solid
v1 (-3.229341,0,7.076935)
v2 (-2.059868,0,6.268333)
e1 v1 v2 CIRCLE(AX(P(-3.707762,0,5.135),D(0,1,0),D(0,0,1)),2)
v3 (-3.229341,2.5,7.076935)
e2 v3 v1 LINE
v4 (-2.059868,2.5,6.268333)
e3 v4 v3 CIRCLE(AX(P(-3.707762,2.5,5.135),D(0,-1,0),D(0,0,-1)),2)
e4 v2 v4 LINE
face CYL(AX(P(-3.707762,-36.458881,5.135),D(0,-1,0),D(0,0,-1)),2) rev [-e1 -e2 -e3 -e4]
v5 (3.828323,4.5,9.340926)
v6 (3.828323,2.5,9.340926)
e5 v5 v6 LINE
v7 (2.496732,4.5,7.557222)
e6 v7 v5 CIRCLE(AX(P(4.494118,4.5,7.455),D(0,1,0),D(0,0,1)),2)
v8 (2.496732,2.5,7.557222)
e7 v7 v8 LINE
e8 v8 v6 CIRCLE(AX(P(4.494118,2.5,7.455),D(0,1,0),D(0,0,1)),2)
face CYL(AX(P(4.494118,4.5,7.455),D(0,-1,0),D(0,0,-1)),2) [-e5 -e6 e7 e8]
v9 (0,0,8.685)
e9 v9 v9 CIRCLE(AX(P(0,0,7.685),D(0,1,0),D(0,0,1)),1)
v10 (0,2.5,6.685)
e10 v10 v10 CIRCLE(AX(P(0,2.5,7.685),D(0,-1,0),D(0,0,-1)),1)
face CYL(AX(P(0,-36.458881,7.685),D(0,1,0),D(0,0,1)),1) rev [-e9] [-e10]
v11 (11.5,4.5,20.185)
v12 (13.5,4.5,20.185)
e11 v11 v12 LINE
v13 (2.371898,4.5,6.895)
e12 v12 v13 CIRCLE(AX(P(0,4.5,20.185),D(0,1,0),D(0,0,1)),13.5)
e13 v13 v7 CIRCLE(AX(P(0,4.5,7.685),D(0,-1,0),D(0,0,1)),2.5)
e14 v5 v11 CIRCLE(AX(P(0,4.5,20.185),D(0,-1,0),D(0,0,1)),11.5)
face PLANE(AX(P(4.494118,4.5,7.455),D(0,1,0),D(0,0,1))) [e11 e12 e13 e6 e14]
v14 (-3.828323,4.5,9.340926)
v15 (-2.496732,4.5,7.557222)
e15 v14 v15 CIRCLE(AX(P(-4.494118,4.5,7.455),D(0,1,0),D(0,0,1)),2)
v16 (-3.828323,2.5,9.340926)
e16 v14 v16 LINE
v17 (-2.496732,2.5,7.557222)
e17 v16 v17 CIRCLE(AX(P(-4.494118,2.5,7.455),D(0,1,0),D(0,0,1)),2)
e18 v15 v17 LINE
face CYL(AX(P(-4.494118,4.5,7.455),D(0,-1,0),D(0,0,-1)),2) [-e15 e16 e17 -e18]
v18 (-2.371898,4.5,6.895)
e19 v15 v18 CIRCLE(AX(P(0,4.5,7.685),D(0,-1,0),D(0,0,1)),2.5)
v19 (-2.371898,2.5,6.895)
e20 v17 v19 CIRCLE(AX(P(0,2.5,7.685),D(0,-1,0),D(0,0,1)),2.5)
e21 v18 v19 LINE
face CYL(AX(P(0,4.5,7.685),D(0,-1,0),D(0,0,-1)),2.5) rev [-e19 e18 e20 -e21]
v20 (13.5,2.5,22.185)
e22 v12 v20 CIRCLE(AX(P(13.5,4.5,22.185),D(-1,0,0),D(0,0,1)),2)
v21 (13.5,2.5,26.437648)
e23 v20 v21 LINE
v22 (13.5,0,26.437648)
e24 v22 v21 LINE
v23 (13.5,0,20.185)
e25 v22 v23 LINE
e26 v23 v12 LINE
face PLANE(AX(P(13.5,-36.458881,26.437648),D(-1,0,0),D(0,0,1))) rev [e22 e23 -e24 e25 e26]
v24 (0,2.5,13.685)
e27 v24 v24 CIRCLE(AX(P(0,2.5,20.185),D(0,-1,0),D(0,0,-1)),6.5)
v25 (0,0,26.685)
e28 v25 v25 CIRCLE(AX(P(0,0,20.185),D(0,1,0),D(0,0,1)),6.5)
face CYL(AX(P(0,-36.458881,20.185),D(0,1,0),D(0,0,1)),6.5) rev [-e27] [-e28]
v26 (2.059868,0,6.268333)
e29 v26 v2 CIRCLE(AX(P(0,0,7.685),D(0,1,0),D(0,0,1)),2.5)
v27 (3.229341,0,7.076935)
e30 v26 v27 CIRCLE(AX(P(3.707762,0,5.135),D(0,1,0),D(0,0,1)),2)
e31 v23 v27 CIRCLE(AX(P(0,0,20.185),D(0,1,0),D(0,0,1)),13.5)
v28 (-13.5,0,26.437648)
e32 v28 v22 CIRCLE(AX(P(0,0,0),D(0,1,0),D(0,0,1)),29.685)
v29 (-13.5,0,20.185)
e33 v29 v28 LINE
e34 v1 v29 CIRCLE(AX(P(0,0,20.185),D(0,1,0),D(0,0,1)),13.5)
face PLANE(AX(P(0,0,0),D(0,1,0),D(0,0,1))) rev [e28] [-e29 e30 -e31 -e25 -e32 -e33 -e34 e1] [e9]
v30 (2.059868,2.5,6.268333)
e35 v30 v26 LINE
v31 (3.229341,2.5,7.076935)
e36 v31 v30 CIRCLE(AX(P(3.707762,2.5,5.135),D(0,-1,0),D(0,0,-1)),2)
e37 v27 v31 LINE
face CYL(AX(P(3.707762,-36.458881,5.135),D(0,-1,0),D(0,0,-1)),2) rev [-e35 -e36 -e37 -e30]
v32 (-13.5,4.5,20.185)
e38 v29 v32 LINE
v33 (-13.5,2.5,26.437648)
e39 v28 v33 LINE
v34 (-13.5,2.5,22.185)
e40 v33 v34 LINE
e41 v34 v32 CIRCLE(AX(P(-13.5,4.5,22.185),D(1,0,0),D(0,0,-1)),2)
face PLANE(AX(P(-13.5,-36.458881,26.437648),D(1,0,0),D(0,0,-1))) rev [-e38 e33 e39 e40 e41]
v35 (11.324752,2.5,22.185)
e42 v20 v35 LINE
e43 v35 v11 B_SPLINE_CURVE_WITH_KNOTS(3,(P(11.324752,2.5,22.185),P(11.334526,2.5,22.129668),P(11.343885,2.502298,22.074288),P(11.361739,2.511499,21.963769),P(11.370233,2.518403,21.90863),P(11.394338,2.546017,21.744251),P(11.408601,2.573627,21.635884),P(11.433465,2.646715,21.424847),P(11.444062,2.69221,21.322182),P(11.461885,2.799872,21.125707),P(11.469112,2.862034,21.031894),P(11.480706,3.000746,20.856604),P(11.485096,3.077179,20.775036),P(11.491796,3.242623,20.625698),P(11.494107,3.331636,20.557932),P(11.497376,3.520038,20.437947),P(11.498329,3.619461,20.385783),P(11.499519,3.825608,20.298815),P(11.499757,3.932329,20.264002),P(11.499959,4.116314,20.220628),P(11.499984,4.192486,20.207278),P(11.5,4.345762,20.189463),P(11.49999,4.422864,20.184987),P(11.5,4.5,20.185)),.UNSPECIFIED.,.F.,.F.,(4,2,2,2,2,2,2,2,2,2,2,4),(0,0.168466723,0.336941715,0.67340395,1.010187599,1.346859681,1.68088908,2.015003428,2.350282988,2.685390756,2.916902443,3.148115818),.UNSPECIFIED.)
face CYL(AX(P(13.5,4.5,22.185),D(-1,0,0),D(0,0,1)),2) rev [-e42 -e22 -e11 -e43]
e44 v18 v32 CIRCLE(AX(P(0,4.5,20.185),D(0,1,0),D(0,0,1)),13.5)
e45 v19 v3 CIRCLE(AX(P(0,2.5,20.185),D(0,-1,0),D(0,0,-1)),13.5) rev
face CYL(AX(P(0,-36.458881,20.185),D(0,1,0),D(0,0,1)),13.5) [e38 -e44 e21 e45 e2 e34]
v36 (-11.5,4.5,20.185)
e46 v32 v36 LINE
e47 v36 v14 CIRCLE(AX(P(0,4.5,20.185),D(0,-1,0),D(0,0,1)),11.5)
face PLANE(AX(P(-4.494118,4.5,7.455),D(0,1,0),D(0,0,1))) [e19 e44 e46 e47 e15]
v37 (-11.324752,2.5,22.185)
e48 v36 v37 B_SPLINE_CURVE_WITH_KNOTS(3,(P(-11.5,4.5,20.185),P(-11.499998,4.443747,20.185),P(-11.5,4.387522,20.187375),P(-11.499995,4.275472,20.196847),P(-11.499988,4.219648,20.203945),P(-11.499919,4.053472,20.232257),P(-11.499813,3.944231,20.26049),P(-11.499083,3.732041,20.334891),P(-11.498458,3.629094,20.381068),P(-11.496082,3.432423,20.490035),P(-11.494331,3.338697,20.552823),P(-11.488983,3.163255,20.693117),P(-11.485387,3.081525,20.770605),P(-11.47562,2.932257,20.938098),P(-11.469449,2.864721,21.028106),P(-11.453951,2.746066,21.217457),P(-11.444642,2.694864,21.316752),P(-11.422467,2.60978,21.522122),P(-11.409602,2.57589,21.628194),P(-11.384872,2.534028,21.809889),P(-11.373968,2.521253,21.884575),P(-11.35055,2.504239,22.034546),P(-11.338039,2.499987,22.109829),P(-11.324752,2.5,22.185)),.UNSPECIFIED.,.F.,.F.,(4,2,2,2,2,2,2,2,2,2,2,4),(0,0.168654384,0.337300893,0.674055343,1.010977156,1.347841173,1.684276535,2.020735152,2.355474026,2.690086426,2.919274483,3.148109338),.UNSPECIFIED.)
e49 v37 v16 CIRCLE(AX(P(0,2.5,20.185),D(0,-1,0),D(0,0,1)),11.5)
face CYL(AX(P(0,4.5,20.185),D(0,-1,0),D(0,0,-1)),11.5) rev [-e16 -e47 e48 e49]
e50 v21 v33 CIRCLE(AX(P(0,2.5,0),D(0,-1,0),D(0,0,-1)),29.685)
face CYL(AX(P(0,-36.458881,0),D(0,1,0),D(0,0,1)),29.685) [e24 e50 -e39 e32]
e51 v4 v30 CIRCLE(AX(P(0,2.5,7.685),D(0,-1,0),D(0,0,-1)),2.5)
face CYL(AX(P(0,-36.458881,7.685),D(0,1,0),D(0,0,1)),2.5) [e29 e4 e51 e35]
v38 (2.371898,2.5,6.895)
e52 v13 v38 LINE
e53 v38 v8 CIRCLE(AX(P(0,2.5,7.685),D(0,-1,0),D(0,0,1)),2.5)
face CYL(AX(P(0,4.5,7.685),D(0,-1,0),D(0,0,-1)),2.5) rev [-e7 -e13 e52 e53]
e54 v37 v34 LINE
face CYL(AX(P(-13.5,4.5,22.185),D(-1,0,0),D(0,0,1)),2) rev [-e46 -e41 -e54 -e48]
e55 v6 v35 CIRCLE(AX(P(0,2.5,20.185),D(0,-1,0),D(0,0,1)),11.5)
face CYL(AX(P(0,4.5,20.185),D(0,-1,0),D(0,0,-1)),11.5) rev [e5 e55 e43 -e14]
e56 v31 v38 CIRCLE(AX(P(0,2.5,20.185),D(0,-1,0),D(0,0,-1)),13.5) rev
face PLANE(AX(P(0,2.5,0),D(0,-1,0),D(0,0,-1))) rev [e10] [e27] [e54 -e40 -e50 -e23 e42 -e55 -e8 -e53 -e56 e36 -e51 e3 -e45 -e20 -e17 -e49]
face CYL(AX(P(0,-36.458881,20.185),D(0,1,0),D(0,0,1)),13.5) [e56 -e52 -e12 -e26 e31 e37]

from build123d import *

# Parameters (mm, degrees)
SKETCH1_R                  = 6.5
SKETCH1_R_2                = 1
MAIN_EXTRUDE_DEPTH         = 2.5
BATTERY_START              = 2
BATTERY_RING_CRADDLE_DEPTH = 2
FILLETS_R                  = 2


with BuildPart() as part:
    # Sketch1 → Main extrude (new body)
    with BuildSketch(Plane.XZ.offset(-2.5)):
        with BuildLine():
            Line((-13.5, 26.437647872), (-13.5, 20.185))
            ThreePointArc((-13.5, 20.185), (-10.350618886, 11.518126938), (-2.371897974, 6.895))
            ThreePointArc((-2.371897974, 6.895), (0, 5.185), (2.371897974, 6.895))
            ThreePointArc((2.371897974, 6.895), (10.350618886, 11.518126938), (13.5, 20.185))
            Line((13.5, 20.185), (13.5, 26.437647872))
            ThreePointArc((13.5, 26.437647872), (0, 29.685), (-13.5, 26.437647872))
        make_face()
        with Locations(Location((0, 20.185, 0), (0, 0, 90))):
            Circle(SKETCH1_R, mode=Mode.SUBTRACT)
        with Locations(Location((0, 7.685, 0), (0, 0, 90))):
            Circle(SKETCH1_R_2, mode=Mode.SUBTRACT)
    extrude(amount=MAIN_EXTRUDE_DEPTH)

    # Sketch2 → Battery ring craddle (add)
    with BuildSketch(Plane(origin=(0, 2.5, 0), x_dir=(1, 0, 0), z_dir=(0, 1, 0)).offset(BATTERY_START)):
        with BuildLine():
            Line((-13.5, -20.185), (-11.5, -20.185))
            ThreePointArc((-11.5, -20.185), (-9.38817648, -13.543302748), (-3.828323063, -9.340925926))
            ThreePointArc((-3.828323063, -9.340925926), (-2.89145393, -8.651439161), (-2.496732433, -7.557222222))
            ThreePointArc((-2.496732433, -7.557222222), (-2.456730567, -7.221885627), (-2.371897974, -6.895))
            ThreePointArc((-2.371897974, -6.895), (-10.350618886, -11.518126938), (-13.5, -20.185))
        make_face()
        with BuildLine():
            Line((13.5, -20.185), (11.5, -20.185))
            ThreePointArc((11.5, -20.185), (9.38817648, -13.543302748), (3.828323063, -9.340925926))
            ThreePointArc((3.828323063, -9.340925926), (2.89145393, -8.651439161), (2.496732433, -7.557222222))
            ThreePointArc((2.496732433, -7.557222222), (2.456730567, -7.221885627), (2.371897974, -6.895))
            ThreePointArc((2.371897974, -6.895), (10.350618886, -11.518126938), (13.5, -20.185))
        make_face()
    extrude(amount=-BATTERY_RING_CRADDLE_DEPTH)

    # Fillets
    # the kernel refuses this fillet: 2 mm, written as the material it adds along each edge
    with BuildSketch(Plane(origin=(2.371897974, 2.5, 6.895), x_dir=(-0.4457237071000903, 0, -0.8951705853796543), z_dir=(0, -1, 0))) as fillets_piece_1:
        with BuildLine():
            CenterArc((0.980073907, 1.980300021), FILLETS_R, 220.3095964, 41.641946396)
            ThreePointArc((-0.545046071, 0.686465004), (-0.266950187, 0.347657285), (0, 0))
            ThreePointArc((0, 0), (0.350026395, 0.024624973), (0.700052791, 0))
        make_face()
    extrude(amount=2.5)
    with BuildSketch(Plane(origin=(-2.371897974, 2.5, 6.895), x_dir=(-0.9782217139639082, 0, 0.20756270939047247), z_dir=(0, -1, 0))) as fillets_piece_2:
        with BuildLine():
            CenterArc((0.941460954, 1.9989458), FILLETS_R, 226.497666749, 41.641946396)
            ThreePointArc((-0.435307275, 0.548253123), (-0.198368351, 0.289438878), (0, 0))
            ThreePointArc((0, 0), (0.438266306, 0.007115851), (0.876532612, 0))
        make_face()
    extrude(amount=2.5)
    with BuildSketch(Plane(origin=(-13.5, 2.5, 20.185), x_dir=(0, 0, 1), z_dir=(1, 0, 0))) as fillets_piece_3_section:
        with BuildLine():
            CenterArc((FILLETS_R, -FILLETS_R), FILLETS_R, 90, 90)
            Line((0, -FILLETS_R), (0, 0))
            Line((0, 0), (FILLETS_R, 0))
        make_face()
    fillets_piece_3 = extrude(amount=7, mode=Mode.PRIVATE)
    fillets_piece_3 = fillets_piece_3 - Plane(origin=(0, 2.67362595, 20.185), x_dir=(-1, 0, 0), z_dir=(0, 1, 0)) * Cylinder(11.5, 22, mode=Mode.PRIVATE)
    add(fillets_piece_3)
    with BuildSketch(Plane(origin=(13.5, 2.5, 20.185), x_dir=(0, 0, 1), z_dir=(-1, 0, 0))) as fillets_piece_4_section:
        with BuildLine():
            CenterArc((FILLETS_R, FILLETS_R), FILLETS_R, 180, 90)
            Line((0, FILLETS_R), (0, 0))
            Line((0, 0), (FILLETS_R, 0))
        make_face()
    fillets_piece_4 = extrude(amount=7, mode=Mode.PRIVATE)
    fillets_piece_4 = fillets_piece_4 - Plane(origin=(0, 2.673614475, 20.185), x_dir=(1, 0, 0), z_dir=(0, 1, 0)) * Cylinder(11.5, 22, mode=Mode.PRIVATE)
    add(fillets_piece_4)


solid = part.part
